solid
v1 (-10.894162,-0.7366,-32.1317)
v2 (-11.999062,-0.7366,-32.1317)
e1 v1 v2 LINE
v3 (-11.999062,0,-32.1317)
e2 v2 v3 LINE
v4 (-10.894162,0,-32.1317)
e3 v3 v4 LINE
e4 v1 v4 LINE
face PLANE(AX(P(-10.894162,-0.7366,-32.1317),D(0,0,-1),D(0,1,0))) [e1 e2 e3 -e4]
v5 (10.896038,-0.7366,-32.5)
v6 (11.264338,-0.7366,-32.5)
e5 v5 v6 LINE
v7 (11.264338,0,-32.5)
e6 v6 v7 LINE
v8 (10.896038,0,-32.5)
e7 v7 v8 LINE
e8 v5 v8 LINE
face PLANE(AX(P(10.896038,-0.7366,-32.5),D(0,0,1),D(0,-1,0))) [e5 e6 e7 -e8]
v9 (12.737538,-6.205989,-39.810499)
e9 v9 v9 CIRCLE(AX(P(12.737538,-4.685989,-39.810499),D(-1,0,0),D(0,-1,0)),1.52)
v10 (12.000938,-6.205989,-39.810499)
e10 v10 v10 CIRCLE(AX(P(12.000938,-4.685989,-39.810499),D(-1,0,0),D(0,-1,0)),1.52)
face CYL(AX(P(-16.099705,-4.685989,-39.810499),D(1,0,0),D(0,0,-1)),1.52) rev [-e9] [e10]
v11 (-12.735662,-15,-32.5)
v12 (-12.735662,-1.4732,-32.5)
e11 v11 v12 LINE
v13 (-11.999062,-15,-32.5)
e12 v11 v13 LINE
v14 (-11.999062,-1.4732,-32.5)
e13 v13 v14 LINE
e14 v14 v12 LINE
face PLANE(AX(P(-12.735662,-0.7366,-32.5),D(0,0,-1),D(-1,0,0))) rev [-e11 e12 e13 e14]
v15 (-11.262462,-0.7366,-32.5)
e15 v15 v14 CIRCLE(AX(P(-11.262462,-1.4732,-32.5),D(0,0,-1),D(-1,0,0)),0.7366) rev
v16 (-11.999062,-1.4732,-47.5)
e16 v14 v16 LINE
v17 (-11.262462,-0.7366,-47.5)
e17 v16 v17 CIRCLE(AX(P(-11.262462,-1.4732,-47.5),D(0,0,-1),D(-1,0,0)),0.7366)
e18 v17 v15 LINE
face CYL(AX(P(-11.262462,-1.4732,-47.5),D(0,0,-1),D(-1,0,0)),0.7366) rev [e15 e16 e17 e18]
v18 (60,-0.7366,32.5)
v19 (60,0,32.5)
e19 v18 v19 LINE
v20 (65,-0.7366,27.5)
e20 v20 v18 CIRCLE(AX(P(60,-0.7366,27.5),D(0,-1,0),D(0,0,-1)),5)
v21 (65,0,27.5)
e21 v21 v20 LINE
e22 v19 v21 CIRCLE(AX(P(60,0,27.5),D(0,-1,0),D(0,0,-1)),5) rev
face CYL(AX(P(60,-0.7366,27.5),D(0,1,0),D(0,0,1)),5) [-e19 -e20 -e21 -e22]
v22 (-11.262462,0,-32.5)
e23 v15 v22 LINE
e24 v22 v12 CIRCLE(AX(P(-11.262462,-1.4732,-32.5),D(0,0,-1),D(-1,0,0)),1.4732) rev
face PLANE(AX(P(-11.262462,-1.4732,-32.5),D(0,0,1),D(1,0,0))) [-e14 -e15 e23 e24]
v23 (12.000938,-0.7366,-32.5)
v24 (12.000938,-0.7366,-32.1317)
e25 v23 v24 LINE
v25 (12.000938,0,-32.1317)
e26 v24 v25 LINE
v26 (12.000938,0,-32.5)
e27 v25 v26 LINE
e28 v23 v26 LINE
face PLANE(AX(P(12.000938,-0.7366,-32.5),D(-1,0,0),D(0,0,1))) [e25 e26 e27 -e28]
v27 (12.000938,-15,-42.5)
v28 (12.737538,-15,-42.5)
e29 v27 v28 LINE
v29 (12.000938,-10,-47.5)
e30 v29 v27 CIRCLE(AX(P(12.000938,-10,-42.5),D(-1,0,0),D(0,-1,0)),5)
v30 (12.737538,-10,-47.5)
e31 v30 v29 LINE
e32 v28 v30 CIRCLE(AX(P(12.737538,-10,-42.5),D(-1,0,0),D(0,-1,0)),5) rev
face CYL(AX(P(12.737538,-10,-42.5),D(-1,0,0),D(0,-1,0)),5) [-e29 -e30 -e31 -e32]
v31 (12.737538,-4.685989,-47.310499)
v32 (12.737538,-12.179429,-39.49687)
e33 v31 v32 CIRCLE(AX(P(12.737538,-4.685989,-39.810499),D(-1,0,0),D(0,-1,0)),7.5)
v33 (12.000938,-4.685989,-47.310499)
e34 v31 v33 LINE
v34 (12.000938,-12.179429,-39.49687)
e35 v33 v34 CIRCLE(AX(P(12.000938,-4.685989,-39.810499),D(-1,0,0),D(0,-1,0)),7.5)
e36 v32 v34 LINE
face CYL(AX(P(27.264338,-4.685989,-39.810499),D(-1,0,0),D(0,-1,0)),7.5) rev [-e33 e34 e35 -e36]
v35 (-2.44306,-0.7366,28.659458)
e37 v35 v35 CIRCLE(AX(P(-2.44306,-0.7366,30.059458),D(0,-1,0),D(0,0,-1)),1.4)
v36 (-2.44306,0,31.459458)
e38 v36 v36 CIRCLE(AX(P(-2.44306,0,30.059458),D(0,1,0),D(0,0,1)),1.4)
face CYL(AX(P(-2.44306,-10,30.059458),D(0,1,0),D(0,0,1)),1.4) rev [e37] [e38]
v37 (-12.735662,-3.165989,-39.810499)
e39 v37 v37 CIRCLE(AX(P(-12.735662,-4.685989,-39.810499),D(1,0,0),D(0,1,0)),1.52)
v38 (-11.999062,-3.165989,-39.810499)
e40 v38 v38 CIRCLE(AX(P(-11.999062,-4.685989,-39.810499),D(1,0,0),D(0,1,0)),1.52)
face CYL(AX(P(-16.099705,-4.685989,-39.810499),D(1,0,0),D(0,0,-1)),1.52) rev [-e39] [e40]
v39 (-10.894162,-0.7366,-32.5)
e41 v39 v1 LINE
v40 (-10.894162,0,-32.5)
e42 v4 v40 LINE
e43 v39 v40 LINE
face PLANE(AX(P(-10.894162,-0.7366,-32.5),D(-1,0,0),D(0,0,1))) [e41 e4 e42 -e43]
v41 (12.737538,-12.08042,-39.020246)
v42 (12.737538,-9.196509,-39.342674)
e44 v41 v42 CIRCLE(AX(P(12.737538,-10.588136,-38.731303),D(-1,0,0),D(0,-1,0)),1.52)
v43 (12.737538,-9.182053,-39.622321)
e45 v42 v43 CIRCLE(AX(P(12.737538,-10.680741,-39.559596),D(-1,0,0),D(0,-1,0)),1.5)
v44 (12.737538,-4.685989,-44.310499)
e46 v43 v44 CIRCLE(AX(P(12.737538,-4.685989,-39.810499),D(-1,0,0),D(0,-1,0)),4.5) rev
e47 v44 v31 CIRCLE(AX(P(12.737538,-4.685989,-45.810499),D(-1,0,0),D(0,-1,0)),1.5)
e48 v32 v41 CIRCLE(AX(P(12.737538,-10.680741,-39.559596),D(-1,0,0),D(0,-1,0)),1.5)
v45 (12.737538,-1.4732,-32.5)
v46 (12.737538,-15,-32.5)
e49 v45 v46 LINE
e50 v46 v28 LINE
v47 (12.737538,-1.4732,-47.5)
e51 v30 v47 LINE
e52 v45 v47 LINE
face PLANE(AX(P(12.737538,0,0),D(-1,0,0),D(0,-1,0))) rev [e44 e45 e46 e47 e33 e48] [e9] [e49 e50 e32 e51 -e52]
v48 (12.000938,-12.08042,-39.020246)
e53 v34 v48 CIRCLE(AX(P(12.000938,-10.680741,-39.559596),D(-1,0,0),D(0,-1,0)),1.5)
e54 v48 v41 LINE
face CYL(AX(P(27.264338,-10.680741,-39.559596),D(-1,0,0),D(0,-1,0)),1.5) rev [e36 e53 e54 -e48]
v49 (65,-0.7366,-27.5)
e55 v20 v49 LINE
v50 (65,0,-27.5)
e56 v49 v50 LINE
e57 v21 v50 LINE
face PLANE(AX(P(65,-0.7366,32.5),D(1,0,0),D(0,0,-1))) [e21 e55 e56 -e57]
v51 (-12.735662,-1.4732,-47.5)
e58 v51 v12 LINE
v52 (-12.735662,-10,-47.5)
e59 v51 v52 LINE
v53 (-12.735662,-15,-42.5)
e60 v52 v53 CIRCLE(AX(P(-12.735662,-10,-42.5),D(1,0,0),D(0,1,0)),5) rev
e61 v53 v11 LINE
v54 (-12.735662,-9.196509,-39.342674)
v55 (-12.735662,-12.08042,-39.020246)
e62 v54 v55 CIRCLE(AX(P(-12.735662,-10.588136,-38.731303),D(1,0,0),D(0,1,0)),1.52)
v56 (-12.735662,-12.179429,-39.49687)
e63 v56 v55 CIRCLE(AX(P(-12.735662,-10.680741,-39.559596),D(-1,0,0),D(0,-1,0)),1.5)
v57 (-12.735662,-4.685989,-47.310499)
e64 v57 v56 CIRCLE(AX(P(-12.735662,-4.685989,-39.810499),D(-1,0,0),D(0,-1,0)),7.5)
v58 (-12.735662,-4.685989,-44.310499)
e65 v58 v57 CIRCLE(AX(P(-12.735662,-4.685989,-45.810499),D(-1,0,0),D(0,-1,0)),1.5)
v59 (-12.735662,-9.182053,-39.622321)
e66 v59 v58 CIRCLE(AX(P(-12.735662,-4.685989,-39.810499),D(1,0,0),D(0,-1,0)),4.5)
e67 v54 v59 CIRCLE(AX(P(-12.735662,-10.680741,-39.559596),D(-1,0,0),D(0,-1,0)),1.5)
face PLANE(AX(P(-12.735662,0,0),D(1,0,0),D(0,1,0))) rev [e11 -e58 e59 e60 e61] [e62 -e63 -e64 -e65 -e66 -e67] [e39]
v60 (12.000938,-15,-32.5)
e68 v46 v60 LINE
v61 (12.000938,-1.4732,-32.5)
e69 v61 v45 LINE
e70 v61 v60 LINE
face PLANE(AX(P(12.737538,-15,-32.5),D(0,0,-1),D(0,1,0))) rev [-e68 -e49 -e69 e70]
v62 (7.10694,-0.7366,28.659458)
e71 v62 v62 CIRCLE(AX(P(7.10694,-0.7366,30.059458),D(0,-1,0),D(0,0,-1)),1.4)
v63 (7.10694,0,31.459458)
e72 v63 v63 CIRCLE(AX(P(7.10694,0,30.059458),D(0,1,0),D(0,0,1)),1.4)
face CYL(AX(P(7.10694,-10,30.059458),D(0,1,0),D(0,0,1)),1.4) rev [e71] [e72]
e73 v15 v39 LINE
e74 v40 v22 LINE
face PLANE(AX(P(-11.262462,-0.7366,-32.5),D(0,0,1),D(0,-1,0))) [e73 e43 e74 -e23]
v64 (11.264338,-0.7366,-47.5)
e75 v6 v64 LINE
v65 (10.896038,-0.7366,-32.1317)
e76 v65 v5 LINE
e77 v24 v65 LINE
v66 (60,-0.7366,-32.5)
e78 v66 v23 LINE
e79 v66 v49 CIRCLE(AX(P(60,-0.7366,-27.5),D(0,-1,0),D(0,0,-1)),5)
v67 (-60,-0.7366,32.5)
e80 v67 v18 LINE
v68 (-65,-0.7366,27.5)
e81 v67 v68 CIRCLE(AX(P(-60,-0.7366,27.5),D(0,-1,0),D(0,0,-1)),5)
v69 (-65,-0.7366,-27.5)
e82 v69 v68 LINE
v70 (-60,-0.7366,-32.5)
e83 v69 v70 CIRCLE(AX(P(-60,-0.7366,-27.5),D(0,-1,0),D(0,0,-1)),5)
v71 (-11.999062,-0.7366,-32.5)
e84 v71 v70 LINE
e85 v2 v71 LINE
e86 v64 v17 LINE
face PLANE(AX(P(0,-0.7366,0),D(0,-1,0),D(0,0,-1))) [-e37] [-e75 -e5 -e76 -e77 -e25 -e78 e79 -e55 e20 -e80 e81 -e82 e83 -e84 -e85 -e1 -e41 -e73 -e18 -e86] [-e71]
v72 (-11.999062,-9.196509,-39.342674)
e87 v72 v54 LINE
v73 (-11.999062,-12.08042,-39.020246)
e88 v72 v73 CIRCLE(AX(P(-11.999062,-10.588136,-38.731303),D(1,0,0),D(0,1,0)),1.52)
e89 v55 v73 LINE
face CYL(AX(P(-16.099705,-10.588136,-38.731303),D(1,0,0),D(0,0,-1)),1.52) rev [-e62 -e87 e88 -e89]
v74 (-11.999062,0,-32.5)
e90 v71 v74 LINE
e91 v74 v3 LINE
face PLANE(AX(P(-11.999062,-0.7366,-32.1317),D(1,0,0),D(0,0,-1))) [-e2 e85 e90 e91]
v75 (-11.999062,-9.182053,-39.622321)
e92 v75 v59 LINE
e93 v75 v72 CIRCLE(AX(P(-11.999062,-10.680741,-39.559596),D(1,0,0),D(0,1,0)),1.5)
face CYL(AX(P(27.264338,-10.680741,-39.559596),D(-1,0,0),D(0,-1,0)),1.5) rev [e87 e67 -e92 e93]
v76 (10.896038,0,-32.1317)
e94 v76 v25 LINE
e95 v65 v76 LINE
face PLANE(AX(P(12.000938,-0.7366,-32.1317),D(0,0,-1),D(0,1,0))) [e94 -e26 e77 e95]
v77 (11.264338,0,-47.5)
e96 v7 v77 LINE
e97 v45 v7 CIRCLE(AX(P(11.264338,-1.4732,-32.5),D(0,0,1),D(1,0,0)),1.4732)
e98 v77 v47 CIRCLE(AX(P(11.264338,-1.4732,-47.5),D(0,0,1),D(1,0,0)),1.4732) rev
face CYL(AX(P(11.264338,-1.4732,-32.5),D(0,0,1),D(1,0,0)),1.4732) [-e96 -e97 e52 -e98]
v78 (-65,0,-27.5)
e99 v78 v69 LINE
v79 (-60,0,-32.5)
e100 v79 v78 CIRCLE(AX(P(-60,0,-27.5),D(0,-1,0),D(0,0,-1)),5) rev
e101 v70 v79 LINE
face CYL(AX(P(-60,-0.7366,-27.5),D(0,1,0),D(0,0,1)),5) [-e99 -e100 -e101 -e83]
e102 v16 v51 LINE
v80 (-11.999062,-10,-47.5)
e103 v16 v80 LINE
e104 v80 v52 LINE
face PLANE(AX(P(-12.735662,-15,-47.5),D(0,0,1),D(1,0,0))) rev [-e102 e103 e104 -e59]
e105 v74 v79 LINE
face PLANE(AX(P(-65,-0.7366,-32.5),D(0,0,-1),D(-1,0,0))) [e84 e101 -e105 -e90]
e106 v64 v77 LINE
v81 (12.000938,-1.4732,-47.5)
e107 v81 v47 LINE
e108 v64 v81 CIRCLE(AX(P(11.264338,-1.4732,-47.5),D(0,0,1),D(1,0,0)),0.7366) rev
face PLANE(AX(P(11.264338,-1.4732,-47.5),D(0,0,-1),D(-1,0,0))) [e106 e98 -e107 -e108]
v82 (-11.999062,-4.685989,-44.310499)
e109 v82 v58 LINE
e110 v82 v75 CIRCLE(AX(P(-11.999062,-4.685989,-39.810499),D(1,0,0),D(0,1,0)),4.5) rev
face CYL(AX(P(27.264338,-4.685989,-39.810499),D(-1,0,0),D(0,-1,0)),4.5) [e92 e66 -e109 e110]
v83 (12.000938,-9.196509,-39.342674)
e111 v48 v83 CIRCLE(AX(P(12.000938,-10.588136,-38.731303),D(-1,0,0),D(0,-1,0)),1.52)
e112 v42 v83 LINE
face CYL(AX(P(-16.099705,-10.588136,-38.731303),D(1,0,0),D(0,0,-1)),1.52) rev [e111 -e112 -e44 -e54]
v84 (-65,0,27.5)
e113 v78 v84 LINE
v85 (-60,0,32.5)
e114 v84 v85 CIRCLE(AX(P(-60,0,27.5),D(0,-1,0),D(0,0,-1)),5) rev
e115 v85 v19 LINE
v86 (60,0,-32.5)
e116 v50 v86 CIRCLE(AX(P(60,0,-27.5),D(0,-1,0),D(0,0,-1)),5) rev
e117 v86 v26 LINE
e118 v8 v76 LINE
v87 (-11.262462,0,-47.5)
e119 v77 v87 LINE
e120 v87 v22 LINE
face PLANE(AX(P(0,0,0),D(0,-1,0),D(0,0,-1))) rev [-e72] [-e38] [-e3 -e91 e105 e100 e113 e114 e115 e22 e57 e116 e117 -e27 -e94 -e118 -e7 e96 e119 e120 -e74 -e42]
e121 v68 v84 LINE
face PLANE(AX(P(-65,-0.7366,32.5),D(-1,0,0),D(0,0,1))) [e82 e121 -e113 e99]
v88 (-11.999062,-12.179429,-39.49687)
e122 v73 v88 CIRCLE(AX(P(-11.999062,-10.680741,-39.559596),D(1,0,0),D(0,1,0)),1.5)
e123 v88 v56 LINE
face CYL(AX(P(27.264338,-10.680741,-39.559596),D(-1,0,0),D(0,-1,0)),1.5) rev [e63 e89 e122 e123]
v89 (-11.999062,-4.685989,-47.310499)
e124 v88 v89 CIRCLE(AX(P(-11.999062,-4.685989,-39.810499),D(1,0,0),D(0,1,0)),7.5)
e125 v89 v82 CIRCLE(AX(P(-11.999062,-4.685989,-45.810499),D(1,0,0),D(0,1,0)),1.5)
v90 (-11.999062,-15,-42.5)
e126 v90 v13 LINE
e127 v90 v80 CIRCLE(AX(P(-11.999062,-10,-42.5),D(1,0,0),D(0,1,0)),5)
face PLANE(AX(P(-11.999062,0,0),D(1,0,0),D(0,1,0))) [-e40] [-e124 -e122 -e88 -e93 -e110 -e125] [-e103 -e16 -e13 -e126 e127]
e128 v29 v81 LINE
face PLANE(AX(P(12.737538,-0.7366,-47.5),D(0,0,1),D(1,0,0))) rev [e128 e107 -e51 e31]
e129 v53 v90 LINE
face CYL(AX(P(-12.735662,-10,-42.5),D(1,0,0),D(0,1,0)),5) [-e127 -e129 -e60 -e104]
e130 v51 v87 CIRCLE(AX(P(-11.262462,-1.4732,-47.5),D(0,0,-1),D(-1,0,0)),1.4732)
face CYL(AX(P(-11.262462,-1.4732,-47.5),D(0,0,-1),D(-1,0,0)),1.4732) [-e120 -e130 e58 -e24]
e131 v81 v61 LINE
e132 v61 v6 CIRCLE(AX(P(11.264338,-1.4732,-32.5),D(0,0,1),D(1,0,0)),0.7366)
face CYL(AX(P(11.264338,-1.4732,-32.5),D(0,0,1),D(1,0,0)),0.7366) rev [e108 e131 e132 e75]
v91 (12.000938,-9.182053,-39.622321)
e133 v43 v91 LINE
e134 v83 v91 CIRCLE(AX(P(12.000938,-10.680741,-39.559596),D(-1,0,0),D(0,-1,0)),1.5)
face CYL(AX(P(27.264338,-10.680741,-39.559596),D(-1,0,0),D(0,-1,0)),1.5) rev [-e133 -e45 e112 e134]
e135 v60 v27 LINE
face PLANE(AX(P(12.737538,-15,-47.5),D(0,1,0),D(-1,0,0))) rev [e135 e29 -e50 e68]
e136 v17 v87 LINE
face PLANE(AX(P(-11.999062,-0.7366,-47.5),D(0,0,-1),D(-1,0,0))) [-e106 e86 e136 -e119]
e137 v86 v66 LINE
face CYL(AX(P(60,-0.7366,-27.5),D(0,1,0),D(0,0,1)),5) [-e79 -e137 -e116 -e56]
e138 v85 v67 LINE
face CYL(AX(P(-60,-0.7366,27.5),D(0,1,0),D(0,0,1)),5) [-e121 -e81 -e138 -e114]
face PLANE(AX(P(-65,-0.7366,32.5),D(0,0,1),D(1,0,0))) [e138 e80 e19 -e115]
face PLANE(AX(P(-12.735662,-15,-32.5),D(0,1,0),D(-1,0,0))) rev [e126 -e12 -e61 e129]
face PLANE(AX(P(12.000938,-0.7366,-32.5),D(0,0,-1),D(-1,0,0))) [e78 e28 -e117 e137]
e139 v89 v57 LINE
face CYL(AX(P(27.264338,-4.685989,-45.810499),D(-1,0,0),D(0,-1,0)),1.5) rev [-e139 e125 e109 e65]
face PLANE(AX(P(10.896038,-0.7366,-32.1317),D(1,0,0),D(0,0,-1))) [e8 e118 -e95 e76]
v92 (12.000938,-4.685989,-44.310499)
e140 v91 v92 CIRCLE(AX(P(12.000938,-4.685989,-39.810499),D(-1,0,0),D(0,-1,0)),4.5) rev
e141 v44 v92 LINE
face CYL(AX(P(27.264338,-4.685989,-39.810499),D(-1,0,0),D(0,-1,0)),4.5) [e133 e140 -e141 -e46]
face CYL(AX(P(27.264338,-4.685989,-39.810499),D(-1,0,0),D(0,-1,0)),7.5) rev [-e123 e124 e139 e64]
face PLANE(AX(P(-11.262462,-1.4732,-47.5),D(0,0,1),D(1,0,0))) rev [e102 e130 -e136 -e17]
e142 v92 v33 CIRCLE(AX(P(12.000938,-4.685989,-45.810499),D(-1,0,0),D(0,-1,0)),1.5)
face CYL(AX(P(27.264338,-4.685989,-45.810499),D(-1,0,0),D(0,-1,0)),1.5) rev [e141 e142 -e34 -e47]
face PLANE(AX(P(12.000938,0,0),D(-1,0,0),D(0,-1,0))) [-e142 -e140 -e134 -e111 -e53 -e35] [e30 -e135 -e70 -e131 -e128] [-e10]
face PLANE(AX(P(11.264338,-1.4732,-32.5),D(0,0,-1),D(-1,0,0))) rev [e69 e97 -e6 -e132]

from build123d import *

# Parameters (mm, degrees)
BASE_FLANGE1_DEPTH   = 0.7366
FILLET1_R            = 5
FILLET2_R            = 5
FILLET3_R            = 5
FILLET4_R            = 5
EDGE_FLANGE2_START   = -47.5
EDGE_FLANGE2_DEPTH   = 15.3683
EDGE_FLANGE2_START_2 = -32.5
EDGE_FLANGE2_2_DEPTH = 0.3683
EDGE_FLANGE2_3_DEPTH = 15
FILLET7_R            = 5
FILLET8_R            = 5
SKETCH18_R           = 1.5
CUT_EXTRUDE1_DEPTH   = 40
SKETCH23_R           = 1.52
CUT_EXTRUDE6_DEPTH   = 30
SKETCH24_R           = 1.52
CUT_EXTRUDE7_DEPTH   = 30
SKETCH25_R           = 1.4
CUT_EXTRUDE8_DEPTH   = 10


with BuildPart() as part:
    # Base-Flange1: sheet metal written as solids
    # Sketch1 → Base-Flange1 (new body)
    with BuildSketch(Plane(origin=(0, 0, 0), x_dir=(1, 0, 0), z_dir=(0, 1, 0))):
        Polygon((19.610938441, 32.5), (65, 32.5), (65, -32.5), (-65, -32.5), (-65, 32.5), (-19.610938441, 32.5), (-11.999061559, 32.5), (-11.999061559, 47.5), (12.000938441, 47.5), (12.000938441, 32.5), align=None)
    extrude(amount=-BASE_FLANGE1_DEPTH)

    # Fillet1
    fillet1_edges = [part.edges().sort_by_distance(p)[0] for p in [
        (65, -0.3683, 32.5),
    ]]
    fillet(fillet1_edges, radius=FILLET1_R)

    # Fillet2
    fillet2_edges = [part.edges().sort_by_distance(p)[0] for p in [
        (65, -0.3683, -32.5),
    ]]
    fillet(fillet2_edges, radius=FILLET2_R)

    # Fillet3
    fillet3_edges = [part.edges().sort_by_distance(p)[0] for p in [
        (-65, -0.3683, 32.5),
    ]]
    fillet(fillet3_edges, radius=FILLET3_R)

    # Fillet4
    fillet4_edges = [part.edges().sort_by_distance(p)[0] for p in [
        (-65, -0.3683, -32.5),
    ]]
    fillet(fillet4_edges, radius=FILLET4_R)

    # Edge-Flange2: read off the stored shape, not the designer's step
    # Edge-Flange2 outline → Edge-Flange2 (cut)
    with BuildSketch(Plane.XY.offset(EDGE_FLANGE2_START)):
        with BuildLine():
            ThreePointArc((-11.999061559, -0.197371375), (-11.643753776, -0.050198073), (-11.262461559, 0))
            Line((-11.262461559, 0), (-11.999061559, 0))
            Line((-11.999061559, 0), (-11.999061559, -0.197371375))
        make_face()
        with BuildLine():
            ThreePointArc((11.264338441, 0), (11.645630659, -0.050198073), (12.000938441, -0.197371375))
            Line((12.000938441, -0.197371375), (12.000938441, 0))
            Line((12.000938441, 0), (11.264338441, 0))
        make_face()
    extrude(amount=EDGE_FLANGE2_DEPTH, mode=Mode.SUBTRACT)

    # Edge-Flange2 2 outline → Edge-Flange2 2 (cut)
    with BuildSketch(Plane.XY.offset(EDGE_FLANGE2_START_2)):
        with BuildLine():
            Line((-11.999061559, -0.7366), (-10.894161559, -0.7366))
            Line((-10.894161559, -0.7366), (-10.894161559, 0))
            Line((-10.894161559, 0), (-11.262461559, 0))
            ThreePointArc((-11.262461559, 0), (-11.643753776, -0.050198073), (-11.999061559, -0.197371375))
            Line((-11.999061559, -0.197371375), (-11.999061559, -0.7366))
        make_face()
        with BuildLine():
            Line((12.000938441, -0.7366), (12.000938441, -0.197371375))
            ThreePointArc((12.000938441, -0.197371375), (11.645630659, -0.050198073), (11.264338441, 0))
            Line((11.264338441, 0), (10.896038441, 0))
            Line((10.896038441, 0), (10.896038441, -0.7366))
            Line((10.896038441, -0.7366), (12.000938441, -0.7366))
        make_face()
    extrude(amount=EDGE_FLANGE2_2_DEPTH, mode=Mode.SUBTRACT)

    # Edge-Flange2 3 outline → Edge-Flange2 3 (add)
    with BuildSketch(Plane.XY.offset(EDGE_FLANGE2_START)):
        with BuildLine():
            ThreePointArc((-11.999061559, -1.4732), (-11.783316414, -0.952345145), (-11.262461559, -0.7366))
            Line((-11.262461559, -0.7366), (-11.999061559, -0.7366))
            Line((-11.999061559, -0.7366), (-11.999061559, -0.197371375))
            ThreePointArc((-11.999061559, -0.197371375), (-12.538290183, -0.7366), (-12.735661559, -1.4732))
            Line((-12.735661559, -1.4732), (-12.735661559, -15))
            Line((-12.735661559, -15), (-11.999061559, -15))
            Line((-11.999061559, -15), (-11.999061559, -1.4732))
        make_face()
        with BuildLine():
            Line((12.737538441, -15), (12.737538441, -1.4732))
            ThreePointArc((12.737538441, -1.4732), (12.540167066, -0.7366), (12.000938441, -0.197371375))
            Line((12.000938441, -0.197371375), (12.000938441, -0.7366))
            Line((12.000938441, -0.7366), (11.264338441, -0.7366))
            ThreePointArc((11.264338441, -0.7366), (11.785193296, -0.952345145), (12.000938441, -1.4732))
            Line((12.000938441, -1.4732), (12.000938441, -15))
            Line((12.000938441, -15), (12.737538441, -15))
        make_face()
    extrude(amount=EDGE_FLANGE2_3_DEPTH)

    # Fillet7
    fillet7_edges = [part.edges().sort_by_distance(p)[0] for p in [
        (12.369238441, -15, -47.5),
    ]]
    fillet(fillet7_edges, radius=FILLET7_R)

    # Fillet8
    fillet8_edges = [part.edges().sort_by_distance(p)[0] for p in [
        (-12.367361559, -15, -47.5),
    ]]
    fillet(fillet8_edges, radius=FILLET8_R)

    # Sketch18 → Cut-Extrude1 (cut)
    with BuildSketch(Plane.ZY.offset(12.735661559)):
        with Locations(Location((-39.810498868, -4.68598948, 0), (0, 0, 270))):
            Circle(SKETCH18_R)
        with BuildLine():
            ThreePointArc((-39.496869826, -12.179429066), (-38.060907717, -10.61801534), (-39.622321443, -9.182053232))
            ThreePointArc((-39.622321443, -9.182053232), (-42.925238149, -7.933819403), (-44.310498868, -4.68598948))
            ThreePointArc((-44.310498868, -4.68598948), (-45.810498868, -3.18598948), (-47.310498868, -4.68598948))
            ThreePointArc((-47.310498868, -4.68598948), (-45.001731004, -10.099039351), (-39.496869826, -12.179429066))
        make_face()
    extrude(amount=-CUT_EXTRUDE1_DEPTH, mode=Mode.SUBTRACT)

    # Sketch23 → Cut-Extrude6 (cut)
    with BuildSketch(Plane(origin=(13.900294902, -97.850887802, -222.979867512), x_dir=(-3.678229639825758e-15, -0.0327435829113364, -0.9994637851258686), z_dir=(1, 0, 0))):
        with Locations(Location((-186.121703077, 87.117320509, 0), (0, 0, 271.876404504))):
            Circle(SKETCH23_R)
    extrude(amount=-CUT_EXTRUDE6_DEPTH, mode=Mode.SUBTRACT)

    # Sketch24 → Cut-Extrude7 (cut)
    with BuildSketch(Plane(origin=(13.900294902, -97.850887802, -222.979867512), x_dir=(-3.678229639825758e-15, -0.0327435829113364, -0.9994637851258686), z_dir=(1, 0, 0))):
        with Locations((-187.007062576, 81.183001798)):
            Circle(SKETCH24_R)
    extrude(amount=-CUT_EXTRUDE7_DEPTH, mode=Mode.SUBTRACT)

    # Sketch25 → Cut-Extrude8 (cut)
    with BuildSketch(Plane(origin=(-71.983966672, 0, -96.098250098), x_dir=(1, 0, 0), z_dir=(0, 1, 0))):
        with Locations(Location((79.090906604, -126.157708005, 0), (0, 0, 270))):
            Circle(SKETCH25_R)
        with Locations(Location((69.540906604, -126.157708005, 0), (0, 0, 270))):
            Circle(SKETCH25_R)
    extrude(amount=-CUT_EXTRUDE8_DEPTH, mode=Mode.SUBTRACT)


solid = part.part
